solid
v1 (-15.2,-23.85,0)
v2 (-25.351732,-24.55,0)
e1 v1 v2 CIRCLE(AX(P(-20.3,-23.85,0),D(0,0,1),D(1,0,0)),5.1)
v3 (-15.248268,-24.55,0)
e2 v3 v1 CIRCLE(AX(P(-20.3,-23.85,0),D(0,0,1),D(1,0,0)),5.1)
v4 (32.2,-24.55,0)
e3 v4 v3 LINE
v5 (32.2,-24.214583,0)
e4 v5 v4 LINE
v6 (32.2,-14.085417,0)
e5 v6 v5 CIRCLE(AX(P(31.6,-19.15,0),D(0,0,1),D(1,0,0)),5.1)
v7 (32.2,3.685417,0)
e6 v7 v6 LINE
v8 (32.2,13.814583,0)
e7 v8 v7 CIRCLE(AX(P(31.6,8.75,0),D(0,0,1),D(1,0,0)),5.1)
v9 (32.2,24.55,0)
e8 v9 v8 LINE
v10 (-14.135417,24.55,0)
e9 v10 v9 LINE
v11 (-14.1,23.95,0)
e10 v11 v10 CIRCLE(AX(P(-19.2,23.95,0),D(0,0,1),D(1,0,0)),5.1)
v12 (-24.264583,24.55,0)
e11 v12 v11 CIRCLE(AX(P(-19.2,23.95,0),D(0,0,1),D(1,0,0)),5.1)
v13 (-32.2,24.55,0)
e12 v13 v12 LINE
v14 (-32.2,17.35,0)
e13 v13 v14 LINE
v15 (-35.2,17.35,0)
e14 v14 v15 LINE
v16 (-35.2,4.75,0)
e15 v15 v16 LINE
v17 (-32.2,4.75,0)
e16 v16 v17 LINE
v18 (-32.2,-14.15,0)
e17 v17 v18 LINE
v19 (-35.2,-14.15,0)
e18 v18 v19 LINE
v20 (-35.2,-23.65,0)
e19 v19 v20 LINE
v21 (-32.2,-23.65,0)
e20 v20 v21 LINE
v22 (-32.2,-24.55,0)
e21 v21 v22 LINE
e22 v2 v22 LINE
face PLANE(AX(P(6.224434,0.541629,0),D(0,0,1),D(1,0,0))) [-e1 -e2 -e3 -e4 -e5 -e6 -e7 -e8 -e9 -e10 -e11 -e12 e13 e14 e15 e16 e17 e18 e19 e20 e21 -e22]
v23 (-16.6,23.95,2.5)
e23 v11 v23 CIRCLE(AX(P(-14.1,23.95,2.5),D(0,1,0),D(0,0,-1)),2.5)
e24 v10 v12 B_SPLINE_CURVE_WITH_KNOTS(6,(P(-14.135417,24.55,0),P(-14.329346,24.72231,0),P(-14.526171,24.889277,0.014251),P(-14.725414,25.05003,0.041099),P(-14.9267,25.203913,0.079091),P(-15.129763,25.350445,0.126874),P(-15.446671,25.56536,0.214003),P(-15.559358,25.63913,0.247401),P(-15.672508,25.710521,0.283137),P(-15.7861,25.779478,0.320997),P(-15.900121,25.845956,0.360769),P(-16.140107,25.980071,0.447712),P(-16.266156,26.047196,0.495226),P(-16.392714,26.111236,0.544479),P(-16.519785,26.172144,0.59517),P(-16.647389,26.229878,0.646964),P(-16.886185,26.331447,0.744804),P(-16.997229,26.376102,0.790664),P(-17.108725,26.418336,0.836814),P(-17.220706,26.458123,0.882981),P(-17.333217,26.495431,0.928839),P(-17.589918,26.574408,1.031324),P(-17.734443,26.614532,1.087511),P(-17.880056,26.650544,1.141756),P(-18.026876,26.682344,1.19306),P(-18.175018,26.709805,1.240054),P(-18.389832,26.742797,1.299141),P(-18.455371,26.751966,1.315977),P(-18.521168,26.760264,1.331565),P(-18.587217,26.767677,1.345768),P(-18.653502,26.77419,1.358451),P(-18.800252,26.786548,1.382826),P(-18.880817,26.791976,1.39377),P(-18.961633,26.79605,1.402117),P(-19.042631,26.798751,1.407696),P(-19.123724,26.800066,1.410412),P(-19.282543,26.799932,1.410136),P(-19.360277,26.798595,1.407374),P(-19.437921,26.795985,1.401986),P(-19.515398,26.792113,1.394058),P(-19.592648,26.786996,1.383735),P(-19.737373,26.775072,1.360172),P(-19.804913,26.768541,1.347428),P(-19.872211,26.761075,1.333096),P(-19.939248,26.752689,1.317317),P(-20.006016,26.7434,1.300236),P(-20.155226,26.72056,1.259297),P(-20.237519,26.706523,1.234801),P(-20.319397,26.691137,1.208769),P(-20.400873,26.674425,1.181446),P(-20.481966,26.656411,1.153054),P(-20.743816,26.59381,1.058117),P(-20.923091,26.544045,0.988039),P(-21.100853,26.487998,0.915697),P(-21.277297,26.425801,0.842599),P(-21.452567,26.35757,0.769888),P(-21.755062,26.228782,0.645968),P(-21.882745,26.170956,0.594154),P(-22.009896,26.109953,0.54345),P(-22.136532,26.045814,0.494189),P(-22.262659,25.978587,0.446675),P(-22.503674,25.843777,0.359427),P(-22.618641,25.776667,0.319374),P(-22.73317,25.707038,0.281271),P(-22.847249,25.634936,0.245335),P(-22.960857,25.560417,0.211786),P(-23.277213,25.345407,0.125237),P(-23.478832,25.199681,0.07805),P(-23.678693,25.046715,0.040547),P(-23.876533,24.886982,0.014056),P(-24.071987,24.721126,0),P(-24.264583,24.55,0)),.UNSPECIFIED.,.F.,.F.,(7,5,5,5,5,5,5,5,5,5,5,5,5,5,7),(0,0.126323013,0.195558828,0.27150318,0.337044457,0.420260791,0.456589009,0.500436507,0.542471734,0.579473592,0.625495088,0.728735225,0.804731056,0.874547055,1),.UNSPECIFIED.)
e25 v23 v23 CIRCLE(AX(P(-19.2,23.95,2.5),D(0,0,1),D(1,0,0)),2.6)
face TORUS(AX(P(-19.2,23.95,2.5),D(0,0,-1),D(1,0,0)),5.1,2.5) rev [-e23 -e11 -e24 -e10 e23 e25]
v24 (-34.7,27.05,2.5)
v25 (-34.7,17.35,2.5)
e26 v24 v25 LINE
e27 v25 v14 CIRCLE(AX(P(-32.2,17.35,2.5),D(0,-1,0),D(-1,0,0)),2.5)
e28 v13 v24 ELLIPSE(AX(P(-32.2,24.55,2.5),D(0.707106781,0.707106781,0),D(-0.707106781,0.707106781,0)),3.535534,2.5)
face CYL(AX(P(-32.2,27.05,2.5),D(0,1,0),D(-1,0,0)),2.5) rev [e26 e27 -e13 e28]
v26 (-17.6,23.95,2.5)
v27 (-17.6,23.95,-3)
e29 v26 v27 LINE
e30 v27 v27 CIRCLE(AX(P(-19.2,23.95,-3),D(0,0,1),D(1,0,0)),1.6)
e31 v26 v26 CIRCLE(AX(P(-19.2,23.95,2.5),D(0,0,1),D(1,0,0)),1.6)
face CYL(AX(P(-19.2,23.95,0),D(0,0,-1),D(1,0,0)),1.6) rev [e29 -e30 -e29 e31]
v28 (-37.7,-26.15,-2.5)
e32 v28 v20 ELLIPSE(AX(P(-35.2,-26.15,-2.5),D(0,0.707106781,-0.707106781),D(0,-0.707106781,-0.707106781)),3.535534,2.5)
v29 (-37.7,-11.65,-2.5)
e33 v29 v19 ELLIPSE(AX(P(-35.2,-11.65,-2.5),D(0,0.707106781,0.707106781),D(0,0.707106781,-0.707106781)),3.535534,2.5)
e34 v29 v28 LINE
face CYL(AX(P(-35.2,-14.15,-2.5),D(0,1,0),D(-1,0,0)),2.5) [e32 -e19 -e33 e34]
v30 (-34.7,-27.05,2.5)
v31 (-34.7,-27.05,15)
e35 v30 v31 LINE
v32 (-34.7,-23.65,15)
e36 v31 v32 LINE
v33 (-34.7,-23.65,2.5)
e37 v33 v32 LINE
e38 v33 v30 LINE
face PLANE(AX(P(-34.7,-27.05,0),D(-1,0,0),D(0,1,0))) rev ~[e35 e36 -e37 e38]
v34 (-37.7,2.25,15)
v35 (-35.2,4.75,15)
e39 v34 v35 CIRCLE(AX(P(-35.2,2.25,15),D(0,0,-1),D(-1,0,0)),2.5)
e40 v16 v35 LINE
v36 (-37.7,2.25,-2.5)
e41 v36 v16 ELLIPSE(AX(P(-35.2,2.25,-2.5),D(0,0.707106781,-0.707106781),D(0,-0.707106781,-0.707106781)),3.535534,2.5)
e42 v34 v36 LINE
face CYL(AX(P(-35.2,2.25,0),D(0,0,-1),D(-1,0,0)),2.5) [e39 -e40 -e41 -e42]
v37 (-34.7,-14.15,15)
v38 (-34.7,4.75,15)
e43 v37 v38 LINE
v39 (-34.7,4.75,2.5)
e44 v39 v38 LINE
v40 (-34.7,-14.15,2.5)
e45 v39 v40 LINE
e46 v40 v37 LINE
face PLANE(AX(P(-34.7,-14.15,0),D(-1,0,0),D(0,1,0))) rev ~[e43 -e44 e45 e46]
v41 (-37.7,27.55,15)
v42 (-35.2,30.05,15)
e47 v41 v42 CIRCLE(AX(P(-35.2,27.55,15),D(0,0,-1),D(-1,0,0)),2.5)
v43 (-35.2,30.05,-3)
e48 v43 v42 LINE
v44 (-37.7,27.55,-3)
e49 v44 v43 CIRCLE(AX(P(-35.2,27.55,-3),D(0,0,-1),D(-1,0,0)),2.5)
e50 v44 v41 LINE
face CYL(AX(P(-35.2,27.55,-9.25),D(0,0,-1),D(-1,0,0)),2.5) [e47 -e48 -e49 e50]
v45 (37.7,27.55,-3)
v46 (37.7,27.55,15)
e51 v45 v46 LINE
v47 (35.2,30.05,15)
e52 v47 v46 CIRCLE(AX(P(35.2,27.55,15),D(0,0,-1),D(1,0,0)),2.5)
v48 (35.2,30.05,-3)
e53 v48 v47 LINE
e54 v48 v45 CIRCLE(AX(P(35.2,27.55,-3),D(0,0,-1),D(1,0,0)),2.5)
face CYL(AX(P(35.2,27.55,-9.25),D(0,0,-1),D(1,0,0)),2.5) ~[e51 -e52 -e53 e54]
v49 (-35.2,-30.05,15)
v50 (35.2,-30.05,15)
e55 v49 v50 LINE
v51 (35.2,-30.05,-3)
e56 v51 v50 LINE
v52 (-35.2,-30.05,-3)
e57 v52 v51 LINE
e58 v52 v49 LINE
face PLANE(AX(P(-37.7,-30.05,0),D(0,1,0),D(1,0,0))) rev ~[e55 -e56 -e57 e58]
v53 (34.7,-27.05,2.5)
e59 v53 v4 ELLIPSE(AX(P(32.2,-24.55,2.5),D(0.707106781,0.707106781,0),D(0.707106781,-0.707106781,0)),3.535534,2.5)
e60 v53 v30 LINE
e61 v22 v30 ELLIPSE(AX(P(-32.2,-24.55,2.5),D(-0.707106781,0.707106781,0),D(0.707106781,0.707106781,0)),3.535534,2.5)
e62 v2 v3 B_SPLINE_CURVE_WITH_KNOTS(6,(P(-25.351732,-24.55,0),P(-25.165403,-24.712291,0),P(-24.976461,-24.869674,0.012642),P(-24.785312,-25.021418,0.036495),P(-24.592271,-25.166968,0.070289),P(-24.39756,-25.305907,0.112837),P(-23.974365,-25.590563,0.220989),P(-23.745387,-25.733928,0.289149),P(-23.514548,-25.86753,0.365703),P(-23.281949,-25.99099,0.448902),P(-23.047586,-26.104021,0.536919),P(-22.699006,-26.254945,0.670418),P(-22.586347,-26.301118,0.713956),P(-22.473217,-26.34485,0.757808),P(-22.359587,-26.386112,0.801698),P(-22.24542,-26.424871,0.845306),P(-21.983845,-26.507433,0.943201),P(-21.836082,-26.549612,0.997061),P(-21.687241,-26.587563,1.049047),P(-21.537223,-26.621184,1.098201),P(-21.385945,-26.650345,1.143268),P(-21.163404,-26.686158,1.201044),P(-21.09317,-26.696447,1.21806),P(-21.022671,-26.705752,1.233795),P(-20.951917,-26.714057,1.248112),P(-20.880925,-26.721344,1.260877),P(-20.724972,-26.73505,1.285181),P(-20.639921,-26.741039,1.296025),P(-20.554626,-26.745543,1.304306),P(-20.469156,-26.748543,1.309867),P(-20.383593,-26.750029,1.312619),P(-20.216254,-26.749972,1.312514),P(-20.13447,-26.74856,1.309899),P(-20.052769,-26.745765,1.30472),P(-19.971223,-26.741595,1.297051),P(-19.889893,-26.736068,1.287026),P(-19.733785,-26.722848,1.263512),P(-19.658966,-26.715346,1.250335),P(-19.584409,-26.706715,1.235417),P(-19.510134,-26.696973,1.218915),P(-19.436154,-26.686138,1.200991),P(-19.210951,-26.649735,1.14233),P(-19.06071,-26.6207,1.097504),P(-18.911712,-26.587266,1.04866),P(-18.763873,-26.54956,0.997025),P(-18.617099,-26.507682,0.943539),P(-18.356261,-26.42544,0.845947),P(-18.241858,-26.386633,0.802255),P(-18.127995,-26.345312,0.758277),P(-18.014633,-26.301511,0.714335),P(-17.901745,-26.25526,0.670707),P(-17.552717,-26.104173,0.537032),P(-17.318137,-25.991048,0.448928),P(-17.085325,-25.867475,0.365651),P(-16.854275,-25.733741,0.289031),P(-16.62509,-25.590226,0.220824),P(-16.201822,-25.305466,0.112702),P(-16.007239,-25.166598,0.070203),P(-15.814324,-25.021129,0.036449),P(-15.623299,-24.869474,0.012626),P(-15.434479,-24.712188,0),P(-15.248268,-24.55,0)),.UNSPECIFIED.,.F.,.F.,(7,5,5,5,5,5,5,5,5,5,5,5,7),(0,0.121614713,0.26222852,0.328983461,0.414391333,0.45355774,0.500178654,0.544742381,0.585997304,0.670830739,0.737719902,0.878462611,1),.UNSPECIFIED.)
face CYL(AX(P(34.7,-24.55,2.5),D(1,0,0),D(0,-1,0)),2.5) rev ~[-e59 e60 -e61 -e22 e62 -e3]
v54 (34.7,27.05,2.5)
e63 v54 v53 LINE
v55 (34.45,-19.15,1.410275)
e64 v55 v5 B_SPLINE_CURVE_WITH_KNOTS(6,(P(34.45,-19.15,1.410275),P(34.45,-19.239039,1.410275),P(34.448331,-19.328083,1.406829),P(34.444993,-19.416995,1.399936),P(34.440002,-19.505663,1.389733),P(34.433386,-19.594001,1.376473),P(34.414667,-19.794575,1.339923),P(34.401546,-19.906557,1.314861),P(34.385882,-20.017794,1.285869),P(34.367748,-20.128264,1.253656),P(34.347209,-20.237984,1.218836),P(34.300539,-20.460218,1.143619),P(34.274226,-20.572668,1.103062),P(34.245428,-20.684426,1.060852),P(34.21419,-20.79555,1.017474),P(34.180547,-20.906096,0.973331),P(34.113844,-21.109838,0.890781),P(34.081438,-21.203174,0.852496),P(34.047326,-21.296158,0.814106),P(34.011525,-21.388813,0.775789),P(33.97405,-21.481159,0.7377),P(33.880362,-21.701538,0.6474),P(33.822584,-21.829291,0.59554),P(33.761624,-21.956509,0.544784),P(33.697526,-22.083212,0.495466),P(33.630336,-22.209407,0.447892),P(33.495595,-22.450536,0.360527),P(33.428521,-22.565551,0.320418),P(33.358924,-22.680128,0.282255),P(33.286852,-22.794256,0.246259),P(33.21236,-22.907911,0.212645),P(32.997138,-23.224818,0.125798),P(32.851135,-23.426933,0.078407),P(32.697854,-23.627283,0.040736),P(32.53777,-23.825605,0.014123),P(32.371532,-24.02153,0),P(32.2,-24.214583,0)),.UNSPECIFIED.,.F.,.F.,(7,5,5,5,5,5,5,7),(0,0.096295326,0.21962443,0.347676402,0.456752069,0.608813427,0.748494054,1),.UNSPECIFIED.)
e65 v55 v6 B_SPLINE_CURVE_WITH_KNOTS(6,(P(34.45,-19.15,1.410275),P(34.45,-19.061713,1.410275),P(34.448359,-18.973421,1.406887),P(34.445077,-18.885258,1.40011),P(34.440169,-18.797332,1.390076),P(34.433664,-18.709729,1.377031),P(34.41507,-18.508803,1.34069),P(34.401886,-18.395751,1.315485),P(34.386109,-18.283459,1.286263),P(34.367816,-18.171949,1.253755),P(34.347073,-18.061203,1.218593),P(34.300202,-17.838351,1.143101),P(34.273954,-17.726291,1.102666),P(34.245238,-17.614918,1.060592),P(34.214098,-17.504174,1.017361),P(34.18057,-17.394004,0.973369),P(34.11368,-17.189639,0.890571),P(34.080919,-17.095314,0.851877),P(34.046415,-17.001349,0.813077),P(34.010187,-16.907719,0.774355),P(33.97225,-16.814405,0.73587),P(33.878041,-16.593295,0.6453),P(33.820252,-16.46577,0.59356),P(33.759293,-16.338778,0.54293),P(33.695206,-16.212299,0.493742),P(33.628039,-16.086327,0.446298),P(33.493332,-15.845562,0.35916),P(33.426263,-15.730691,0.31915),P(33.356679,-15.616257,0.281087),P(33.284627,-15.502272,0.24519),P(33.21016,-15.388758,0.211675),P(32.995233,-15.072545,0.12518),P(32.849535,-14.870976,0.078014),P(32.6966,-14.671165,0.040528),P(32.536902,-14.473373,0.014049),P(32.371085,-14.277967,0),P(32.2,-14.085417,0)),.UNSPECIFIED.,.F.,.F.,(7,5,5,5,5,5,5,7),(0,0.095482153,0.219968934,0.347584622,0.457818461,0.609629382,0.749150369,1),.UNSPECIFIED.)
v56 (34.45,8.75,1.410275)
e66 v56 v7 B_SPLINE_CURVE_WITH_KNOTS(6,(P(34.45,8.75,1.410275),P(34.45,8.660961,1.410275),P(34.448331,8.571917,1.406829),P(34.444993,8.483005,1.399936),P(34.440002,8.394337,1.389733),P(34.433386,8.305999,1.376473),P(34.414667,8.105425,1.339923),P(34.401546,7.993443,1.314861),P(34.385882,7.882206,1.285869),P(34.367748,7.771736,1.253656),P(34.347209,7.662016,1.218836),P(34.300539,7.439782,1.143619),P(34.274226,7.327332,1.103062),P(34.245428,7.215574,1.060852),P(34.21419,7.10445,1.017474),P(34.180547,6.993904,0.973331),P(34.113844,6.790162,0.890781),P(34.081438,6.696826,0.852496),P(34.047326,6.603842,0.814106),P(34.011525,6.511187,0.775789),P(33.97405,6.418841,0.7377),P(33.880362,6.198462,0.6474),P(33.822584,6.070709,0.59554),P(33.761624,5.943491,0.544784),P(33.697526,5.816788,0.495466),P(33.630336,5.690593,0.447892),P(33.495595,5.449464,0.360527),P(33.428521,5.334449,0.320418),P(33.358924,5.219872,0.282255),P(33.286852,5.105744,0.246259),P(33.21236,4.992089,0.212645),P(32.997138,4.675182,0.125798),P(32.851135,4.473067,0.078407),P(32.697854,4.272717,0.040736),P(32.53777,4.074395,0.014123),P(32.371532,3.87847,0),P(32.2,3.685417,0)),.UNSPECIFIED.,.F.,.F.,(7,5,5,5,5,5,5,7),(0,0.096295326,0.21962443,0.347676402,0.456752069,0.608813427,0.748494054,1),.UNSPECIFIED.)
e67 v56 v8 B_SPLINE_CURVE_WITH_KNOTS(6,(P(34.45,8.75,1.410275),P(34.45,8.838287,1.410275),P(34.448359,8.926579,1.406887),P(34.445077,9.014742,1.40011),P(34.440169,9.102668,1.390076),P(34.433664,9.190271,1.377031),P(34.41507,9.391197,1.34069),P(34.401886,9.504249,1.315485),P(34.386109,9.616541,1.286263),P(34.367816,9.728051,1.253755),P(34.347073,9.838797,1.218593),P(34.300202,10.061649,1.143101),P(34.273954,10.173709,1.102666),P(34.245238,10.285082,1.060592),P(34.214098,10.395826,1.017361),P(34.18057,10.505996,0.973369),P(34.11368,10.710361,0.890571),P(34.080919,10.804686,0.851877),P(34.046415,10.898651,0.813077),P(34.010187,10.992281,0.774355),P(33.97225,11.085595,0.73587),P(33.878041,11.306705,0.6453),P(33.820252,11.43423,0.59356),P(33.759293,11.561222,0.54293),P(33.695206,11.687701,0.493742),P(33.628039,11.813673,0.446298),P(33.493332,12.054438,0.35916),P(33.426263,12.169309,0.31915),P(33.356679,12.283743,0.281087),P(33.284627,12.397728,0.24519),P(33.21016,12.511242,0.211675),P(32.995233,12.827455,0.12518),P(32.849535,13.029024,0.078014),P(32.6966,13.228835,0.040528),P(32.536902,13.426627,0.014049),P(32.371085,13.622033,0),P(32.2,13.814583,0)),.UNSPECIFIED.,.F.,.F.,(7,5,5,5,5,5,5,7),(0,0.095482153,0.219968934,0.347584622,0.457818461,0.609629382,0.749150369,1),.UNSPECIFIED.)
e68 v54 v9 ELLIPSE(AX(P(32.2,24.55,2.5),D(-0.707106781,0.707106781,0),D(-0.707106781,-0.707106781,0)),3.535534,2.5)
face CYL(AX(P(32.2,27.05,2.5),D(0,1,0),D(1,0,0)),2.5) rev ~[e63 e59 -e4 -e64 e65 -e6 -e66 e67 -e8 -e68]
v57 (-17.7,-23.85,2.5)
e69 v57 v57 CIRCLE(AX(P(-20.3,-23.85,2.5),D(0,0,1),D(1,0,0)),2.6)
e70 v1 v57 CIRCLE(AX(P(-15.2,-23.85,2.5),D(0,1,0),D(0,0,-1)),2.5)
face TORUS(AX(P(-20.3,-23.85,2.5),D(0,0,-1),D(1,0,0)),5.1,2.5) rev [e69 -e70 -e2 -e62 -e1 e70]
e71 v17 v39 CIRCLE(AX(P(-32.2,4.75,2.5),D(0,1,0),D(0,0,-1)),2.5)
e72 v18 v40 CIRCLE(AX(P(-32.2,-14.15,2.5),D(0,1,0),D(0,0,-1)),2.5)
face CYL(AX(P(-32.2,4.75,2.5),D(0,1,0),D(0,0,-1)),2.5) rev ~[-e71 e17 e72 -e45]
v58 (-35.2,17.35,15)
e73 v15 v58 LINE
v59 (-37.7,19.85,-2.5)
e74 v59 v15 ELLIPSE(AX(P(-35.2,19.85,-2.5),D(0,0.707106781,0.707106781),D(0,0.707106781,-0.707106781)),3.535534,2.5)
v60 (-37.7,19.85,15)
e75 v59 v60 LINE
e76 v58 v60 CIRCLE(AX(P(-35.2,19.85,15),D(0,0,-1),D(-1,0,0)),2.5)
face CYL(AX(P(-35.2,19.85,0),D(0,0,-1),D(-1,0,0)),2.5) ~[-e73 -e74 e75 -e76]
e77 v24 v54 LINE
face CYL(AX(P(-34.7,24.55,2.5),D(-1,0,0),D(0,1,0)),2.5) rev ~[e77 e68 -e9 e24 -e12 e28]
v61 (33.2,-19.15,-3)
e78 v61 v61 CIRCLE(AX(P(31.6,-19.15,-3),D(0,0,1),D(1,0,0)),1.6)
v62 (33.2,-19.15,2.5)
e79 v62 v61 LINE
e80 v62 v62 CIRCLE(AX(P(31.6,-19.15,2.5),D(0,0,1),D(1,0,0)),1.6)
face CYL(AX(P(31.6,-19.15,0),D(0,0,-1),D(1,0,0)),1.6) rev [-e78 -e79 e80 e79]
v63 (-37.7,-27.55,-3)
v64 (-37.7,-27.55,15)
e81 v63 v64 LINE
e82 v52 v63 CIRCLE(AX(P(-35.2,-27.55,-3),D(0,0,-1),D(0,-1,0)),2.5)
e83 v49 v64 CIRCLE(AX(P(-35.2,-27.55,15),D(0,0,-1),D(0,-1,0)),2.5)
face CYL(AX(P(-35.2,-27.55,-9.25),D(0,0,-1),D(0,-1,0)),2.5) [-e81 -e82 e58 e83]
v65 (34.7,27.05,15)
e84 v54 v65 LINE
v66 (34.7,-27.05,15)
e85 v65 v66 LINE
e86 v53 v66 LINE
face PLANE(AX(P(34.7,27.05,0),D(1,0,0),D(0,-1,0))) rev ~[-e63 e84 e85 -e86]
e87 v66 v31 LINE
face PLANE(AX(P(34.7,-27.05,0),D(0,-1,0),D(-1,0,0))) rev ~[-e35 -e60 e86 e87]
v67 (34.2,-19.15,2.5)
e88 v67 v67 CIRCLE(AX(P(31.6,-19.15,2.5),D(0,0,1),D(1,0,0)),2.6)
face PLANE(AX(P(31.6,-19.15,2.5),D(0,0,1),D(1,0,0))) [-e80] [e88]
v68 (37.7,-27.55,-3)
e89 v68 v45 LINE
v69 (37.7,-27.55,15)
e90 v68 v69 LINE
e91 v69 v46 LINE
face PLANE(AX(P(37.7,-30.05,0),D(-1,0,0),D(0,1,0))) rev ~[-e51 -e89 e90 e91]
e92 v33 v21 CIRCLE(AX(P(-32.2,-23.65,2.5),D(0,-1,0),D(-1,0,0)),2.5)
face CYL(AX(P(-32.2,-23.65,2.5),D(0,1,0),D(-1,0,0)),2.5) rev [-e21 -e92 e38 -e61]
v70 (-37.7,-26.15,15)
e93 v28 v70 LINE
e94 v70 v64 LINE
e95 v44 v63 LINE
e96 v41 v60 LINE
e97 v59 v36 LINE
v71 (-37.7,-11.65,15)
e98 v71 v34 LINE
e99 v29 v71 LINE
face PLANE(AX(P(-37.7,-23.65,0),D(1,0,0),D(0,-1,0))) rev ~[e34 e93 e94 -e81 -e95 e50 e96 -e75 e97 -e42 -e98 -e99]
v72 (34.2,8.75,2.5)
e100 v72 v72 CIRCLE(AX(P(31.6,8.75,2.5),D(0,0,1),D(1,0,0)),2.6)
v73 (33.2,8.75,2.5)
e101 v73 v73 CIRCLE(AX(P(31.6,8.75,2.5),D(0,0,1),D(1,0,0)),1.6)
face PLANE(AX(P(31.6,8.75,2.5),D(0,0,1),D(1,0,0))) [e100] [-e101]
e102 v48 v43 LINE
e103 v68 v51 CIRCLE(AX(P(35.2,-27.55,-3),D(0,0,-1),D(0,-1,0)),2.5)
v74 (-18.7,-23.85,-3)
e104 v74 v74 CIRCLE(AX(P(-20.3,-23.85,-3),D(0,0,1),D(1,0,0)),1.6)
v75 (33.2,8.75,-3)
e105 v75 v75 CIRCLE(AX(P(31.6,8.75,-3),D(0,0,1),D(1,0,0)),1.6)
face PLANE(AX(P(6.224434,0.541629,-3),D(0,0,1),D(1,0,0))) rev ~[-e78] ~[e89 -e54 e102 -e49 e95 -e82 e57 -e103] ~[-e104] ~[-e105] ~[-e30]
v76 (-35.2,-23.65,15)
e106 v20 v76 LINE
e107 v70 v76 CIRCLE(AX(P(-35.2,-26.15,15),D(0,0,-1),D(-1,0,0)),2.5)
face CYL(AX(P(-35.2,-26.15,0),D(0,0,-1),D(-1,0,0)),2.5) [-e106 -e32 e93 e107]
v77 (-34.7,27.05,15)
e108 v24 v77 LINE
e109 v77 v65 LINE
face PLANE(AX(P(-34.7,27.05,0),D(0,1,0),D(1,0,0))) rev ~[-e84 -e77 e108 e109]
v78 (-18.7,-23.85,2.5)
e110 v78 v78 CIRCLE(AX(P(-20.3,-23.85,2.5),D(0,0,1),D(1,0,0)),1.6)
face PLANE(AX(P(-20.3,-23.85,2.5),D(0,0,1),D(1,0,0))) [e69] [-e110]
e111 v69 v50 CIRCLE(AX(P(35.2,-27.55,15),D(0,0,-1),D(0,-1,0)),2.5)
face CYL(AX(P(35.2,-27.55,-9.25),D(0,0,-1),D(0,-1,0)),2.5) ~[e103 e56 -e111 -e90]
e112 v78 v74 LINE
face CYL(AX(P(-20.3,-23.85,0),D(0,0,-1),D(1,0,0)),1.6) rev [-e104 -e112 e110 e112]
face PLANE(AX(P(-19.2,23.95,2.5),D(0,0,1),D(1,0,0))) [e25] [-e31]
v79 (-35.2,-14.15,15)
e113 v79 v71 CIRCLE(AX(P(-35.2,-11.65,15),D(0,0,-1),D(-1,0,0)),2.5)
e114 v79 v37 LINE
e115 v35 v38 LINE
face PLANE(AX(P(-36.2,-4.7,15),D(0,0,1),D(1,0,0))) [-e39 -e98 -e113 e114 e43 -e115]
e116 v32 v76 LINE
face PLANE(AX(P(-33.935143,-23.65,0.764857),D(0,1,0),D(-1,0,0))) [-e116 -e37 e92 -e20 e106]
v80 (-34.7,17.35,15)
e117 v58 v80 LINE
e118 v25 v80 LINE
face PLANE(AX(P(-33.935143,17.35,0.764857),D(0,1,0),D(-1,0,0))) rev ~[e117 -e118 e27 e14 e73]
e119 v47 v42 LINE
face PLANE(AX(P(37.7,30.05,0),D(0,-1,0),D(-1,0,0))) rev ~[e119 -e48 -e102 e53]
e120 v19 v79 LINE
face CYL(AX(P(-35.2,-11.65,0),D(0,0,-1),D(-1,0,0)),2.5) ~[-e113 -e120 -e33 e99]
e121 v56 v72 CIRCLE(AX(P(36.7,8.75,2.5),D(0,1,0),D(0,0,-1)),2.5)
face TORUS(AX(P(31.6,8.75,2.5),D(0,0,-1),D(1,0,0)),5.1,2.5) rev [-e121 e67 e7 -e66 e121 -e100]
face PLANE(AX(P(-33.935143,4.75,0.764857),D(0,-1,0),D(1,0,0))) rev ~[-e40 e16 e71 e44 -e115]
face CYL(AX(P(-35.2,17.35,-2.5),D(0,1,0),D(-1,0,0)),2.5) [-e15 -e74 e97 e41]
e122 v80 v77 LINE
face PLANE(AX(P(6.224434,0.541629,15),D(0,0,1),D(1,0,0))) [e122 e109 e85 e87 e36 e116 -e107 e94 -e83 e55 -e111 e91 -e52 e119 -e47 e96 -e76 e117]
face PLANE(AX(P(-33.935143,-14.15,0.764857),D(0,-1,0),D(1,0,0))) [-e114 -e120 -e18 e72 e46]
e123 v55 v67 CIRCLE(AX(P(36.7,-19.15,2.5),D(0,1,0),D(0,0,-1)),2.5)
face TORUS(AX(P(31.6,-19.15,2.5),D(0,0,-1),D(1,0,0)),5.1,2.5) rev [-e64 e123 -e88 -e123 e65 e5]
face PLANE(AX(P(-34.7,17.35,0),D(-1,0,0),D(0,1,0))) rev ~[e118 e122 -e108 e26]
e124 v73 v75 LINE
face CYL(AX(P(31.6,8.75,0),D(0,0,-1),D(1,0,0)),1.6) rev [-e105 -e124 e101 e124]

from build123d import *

# Parameters (mm, degrees)
F0_W         = 0.4
F0_H         = 0.3
F0_H_2       = 8.9
F0_W_2       = 9.5
F0_R         = 2.6
F0_W_3       = 10.3
F0_H_3       = 12
F0_W_4       = 3
F0_R_2       = 1.6
F0_H_4       = 18.9
F1_DEPTH     = 3
F2_DEPTH     = 15
F3_DEPTH     = 2.5
F4_T1_DEPTH  = 9.7
F4_T3_DEPTH  = 18.9
F4_T5_DEPTH  = 3.4
F4_T10_DEPTH = 69.4
F4_S11_R     = 2.6
F4_T12_DEPTH = 36
F4_T16_DEPTH = 69.4
F4_S17_R     = 2.6
F4_T18_DEPTH = 36
F4_T22_DEPTH = 54.1
F4_S23_R     = 2.6
F4_T24_DEPTH = 29
F4_S25_R     = 2.6
F4_T26_DEPTH = 29
F4_T35_DEPTH = 30.5
F4_T37_DEPTH = 21.25
F4_T39_DEPTH = 12.6
F4_T41_DEPTH = 9.5
F4_T47_DEPTH = 15.75
F4_T51_DEPTH = 21.25
F4_T59_DEPTH = 18.85
F4_T63_DEPTH = 21.25
F4_T71_DEPTH = 21.25
F4_T76_DEPTH = 18.85
F4_T83_DEPTH = 21.25
F4_T88_DEPTH = 15.75


# Not quite as in the source:
# - a fillet or chamfer that OpenCascade refuses, or shapes differently, is made with other operations: its cross-section is extruded or revolved along the edge and cut away or added


with BuildPart() as f1:
    # F0 (on Top) → F1 (new body)
    with BuildSketch(Plane.XY):
        Polygon((-34.7, -27.05), (-34.7, -23.65), (-37.7, -23.65), (-37.7, -30.05), (37.7, -30.05), (37.7, 30.05), (-37.7, 30.05), (-37.7, 17.35), (-34.7, 17.35), (-34.7, 27.05), (34.7, 27.05), (34.7, -27.05), align=None)
        with Locations((-34.5, -14.3)):
            Rectangle(F0_W, F0_H)
        with Locations((-34.5, -18.9)):
            Rectangle(F0_W, F0_H_2)
        with Locations((-29.55, -18.9)):
            Rectangle(F0_W_2, F0_H_2)
        Polygon((-34.3, -26.65), (34.3, -26.65), (34.3, 26.65), (-34.3, 26.65), (-34.3, 17.35), (-23.7, 17.35), (-23.7, 4.75), (-34.3, 4.75), (-34.3, -14.15), (-24.5, -14.15), (-24.5, -23.65), (-34.3, -23.65), align=None)
        with Locations((-20.3, -23.85)):
            Circle(F0_R, mode=Mode.SUBTRACT)
        with Locations((31.6, -19.15)):
            Circle(F0_R, mode=Mode.SUBTRACT)
        with Locations((-19.2, 23.95)):
            Circle(F0_R, mode=Mode.SUBTRACT)
        with Locations((31.6, 8.75)):
            Circle(F0_R, mode=Mode.SUBTRACT)
        Polygon((34.3, 26.65), (34.3, -26.65), (-34.3, -26.65), (-34.3, -23.65), (-34.7, -23.65), (-34.7, -27.05), (34.7, -27.05), (34.7, 27.05), (-34.7, 27.05), (-34.7, 17.35), (-34.3, 17.35), (-34.3, 26.65), align=None)
        with Locations((-29.15, 11.05)):
            Rectangle(F0_W_3, F0_H_3)
        with Locations((-36.2, 11.05)):
            Rectangle(F0_W_4, F0_H_3)
        with Locations((-34.5, 11.05)):
            Rectangle(F0_W, F0_H_3)
        with Locations((-36.2, -18.9)):
            Rectangle(F0_W_4, F0_H_2)
        with Locations((-36.2, -14.3)):
            Rectangle(F0_W_4, F0_H)
        with Locations((-19.2, 23.95)):
            Circle(F0_R)
        with Locations((-19.2, 23.95)):
            Circle(F0_R_2, mode=Mode.SUBTRACT)
        with Locations((-20.3, -23.85)):
            Circle(F0_R)
        with Locations((-20.3, -23.85)):
            Circle(F0_R_2, mode=Mode.SUBTRACT)
        with Locations((31.6, -19.15)):
            Circle(F0_R)
        with Locations((31.6, -19.15)):
            Circle(F0_R_2, mode=Mode.SUBTRACT)
        with Locations((31.6, 8.75)):
            Circle(F0_R)
        with Locations((31.6, 8.75)):
            Circle(F0_R_2, mode=Mode.SUBTRACT)
        with Locations((-36.2, 4.9)):
            Rectangle(F0_W_4, F0_H)
        with Locations((-34.5, 4.9)):
            Rectangle(F0_W, F0_H)
        Polygon((-23.7, 17.35), (-34.3, 17.35), (-34.3, 17.05), (-24, 17.05), (-24, 5.05), (-34.3, 5.05), (-34.3, 4.75), (-23.7, 4.75), align=None)
        with Locations((-34.5, -4.7)):
            Rectangle(F0_W, F0_H_4)
        with Locations((-36.2, -4.7)):
            Rectangle(F0_W_4, F0_H_4)
        Polygon((-34.3, -23.35), (-34.3, -23.65), (-24.5, -23.65), (-24.5, -14.15), (-34.3, -14.15), (-34.3, -14.45), (-24.8, -14.45), (-24.8, -23.35), align=None)
        with Locations((-36.2, 17.2)):
            Rectangle(F0_W_4, F0_H)
        with Locations((-34.5, 17.2)):
            Rectangle(F0_W, F0_H)
        with Locations((-34.5, -23.5)):
            Rectangle(F0_W, F0_H)
        with Locations((-36.2, -23.5)):
            Rectangle(F0_W_4, F0_H)
    extrude(amount=-F1_DEPTH)

    # F0 (on Top) → F2 (join)
    with BuildSketch(Plane.XY):
        Polygon((-34.7, -27.05), (-34.7, -23.65), (-37.7, -23.65), (-37.7, -30.05), (37.7, -30.05), (37.7, 30.05), (-37.7, 30.05), (-37.7, 17.35), (-34.7, 17.35), (-34.7, 27.05), (34.7, 27.05), (34.7, -27.05), align=None)
        with Locations((-36.2, -4.7)):
            Rectangle(F0_W_4, F0_H_4)
    extrude(amount=F2_DEPTH)

    # F0 (on Top) → F3 (join)
    with BuildSketch(Plane.XY):
        with Locations((-20.3, -23.85)):
            Circle(F0_R)
        with Locations((-20.3, -23.85)):
            Circle(F0_R_2, mode=Mode.SUBTRACT)
        with Locations((-19.2, 23.95)):
            Circle(F0_R)
        with Locations((-19.2, 23.95)):
            Circle(F0_R_2, mode=Mode.SUBTRACT)
        with Locations((31.6, 8.75)):
            Circle(F0_R)
        with Locations((31.6, 8.75)):
            Circle(F0_R_2, mode=Mode.SUBTRACT)
        with Locations((31.6, -19.15)):
            Circle(F0_R)
        with Locations((31.6, -19.15)):
            Circle(F0_R_2, mode=Mode.SUBTRACT)
    extrude(amount=F3_DEPTH)

    # F4: fillet of radius 2.5 on 20 edges, made by hand

    # F4_s2 → F4_t1 (join)
    with BuildSketch(Plane.XZ.offset(-27.05)):
        with BuildLine():
            ThreePointArc((-34.7, 2.5), (-33.967766953, 0.732233047), (-32.2, 0))
            Line((-32.2, 0), (-34.7, 0))
            Line((-34.7, 0), (-34.7, 2.5))
        make_face()
    extrude(amount=F4_T1_DEPTH)

    # F4_s4 → F4_t3 (join)
    with BuildSketch(Plane.XZ.offset(-4.75)):
        with BuildLine():
            ThreePointArc((-32.2, 0), (-33.967766953, 0.732233047), (-34.7, 2.5))
            Line((-34.7, 2.5), (-34.7, 0))
            Line((-34.7, 0), (-32.2, 0))
        make_face()
    extrude(amount=F4_T3_DEPTH)

    # F4_s6 → F4_t5 (join)
    with BuildSketch(Plane.XZ.offset(23.65)):
        with BuildLine():
            ThreePointArc((-34.7, 2.5), (-33.967766953, 0.732233047), (-32.2, 0))
            Line((-32.2, 0), (-34.7, 0))
            Line((-34.7, 0), (-34.7, 2.5))
        make_face()
    extrude(amount=F4_T5_DEPTH)


with BuildPart() as f4_tool8:
    # F4_s9 → F4_t10 (new body)
    with BuildSketch(Plane.YZ.offset(-34.7)):
        with BuildLine():
            ThreePointArc((27.05, 2.5), (26.317766953, 0.732233047), (24.55, 0))
            Line((24.55, 0), (27.05, 0))
            Line((27.05, 0), (27.05, 2.5))
        make_face()
    extrude(amount=F4_T10_DEPTH)

    # F4_s11 → F4_t12 (cut, symmetric)
    with BuildSketch(Plane.XY.offset(1.2)):
        with Locations((-19.2, 23.95)):
            Circle(F4_S11_R)
    extrude(amount=F4_T12_DEPTH, both=True, mode=Mode.SUBTRACT)


with BuildPart() as f1_1:
    add(f1.part)

    # F4_t7: union F4_tool8
    add(f4_tool8.part)


with BuildPart() as f4_tool14:
    # F4_s15 → F4_t16 (new body)
    with BuildSketch(Plane.YZ.offset(34.7)):
        with BuildLine():
            ThreePointArc((-27.05, 2.5), (-26.317766953, 0.732233047), (-24.55, 0))
            Line((-24.55, 0), (-27.05, 0))
            Line((-27.05, 0), (-27.05, 2.5))
        make_face()
    extrude(amount=-F4_T16_DEPTH)

    # F4_s17 → F4_t18 (cut, symmetric)
    with BuildSketch(Plane.XY.offset(1.2)):
        with Locations((-20.3, -23.85)):
            Circle(F4_S17_R)
    extrude(amount=F4_T18_DEPTH, both=True, mode=Mode.SUBTRACT)


with BuildPart() as f1_2:
    add(f1_1.part)

    # F4_t13: union F4_tool14
    add(f4_tool14.part)


with BuildPart() as f4_tool20:
    # F4_s21 → F4_t22 (new body)
    with BuildSketch(Plane.XZ.offset(-27.05)):
        with BuildLine():
            ThreePointArc((34.7, 2.5), (33.967766953, 0.732233047), (32.2, 0))
            Line((32.2, 0), (34.7, 0))
            Line((34.7, 0), (34.7, 2.5))
        make_face()
    extrude(amount=F4_T22_DEPTH)

    # F4_s23 → F4_t24 (cut, symmetric)
    with BuildSketch(Plane.XY.offset(1.2)):
        with Locations((31.6, -19.15)):
            Circle(F4_S23_R)
    extrude(amount=F4_T24_DEPTH, both=True, mode=Mode.SUBTRACT)

    # F4_s25 → F4_t26 (cut, symmetric)
    with BuildSketch(Plane.XY.offset(1.2)):
        with Locations((31.6, 8.75)):
            Circle(F4_S25_R)
    extrude(amount=F4_T26_DEPTH, both=True, mode=Mode.SUBTRACT)


with BuildPart() as f1_3:
    add(f1_2.part)

    # F4_t19: union F4_tool20
    add(f4_tool20.part)

    # F4_s27 → F4_t28 (revolve)
    with BuildSketch(Plane.XZ.offset(-8.75)):
        with BuildLine():
            ThreePointArc((36.7, 0), (34.932233047, 0.732233047), (34.2, 2.5))
            Line((34.2, 2.5), (34.2, 0))
            Line((34.2, 0), (36.7, 0))
        make_face()
    revolve(axis=Axis((31.6, 8.75, 0), (0, 0, 1)))

    # F4_s29 → F4_t30 (revolve)
    with BuildSketch(Plane.XZ.offset(19.15)):
        with BuildLine():
            ThreePointArc((36.7, 0), (34.932233047, 0.732233047), (34.2, 2.5))
            Line((34.2, 2.5), (34.2, 0))
            Line((34.2, 0), (36.7, 0))
        make_face()
    revolve(axis=Axis((31.6, -19.15, 0), (0, 0, 1)))

    # F4_s31 → F4_t32 (revolve)
    with BuildSketch(Plane.XZ.offset(23.85)):
        with BuildLine():
            ThreePointArc((-15.2, 0), (-16.967766953, 0.732233047), (-17.7, 2.5))
            Line((-17.7, 2.5), (-17.7, 0))
            Line((-17.7, 0), (-15.2, 0))
        make_face()
    revolve(axis=Axis((-20.3, -23.85, 0), (0, 0, 1)))

    # F4_s33 → F4_t34 (revolve)
    with BuildSketch(Plane.XZ.offset(-23.95)):
        with BuildLine():
            ThreePointArc((-14.1, 0), (-15.867766953, 0.732233047), (-16.6, 2.5))
            Line((-16.6, 2.5), (-16.6, 0))
            Line((-16.6, 0), (-14.1, 0))
        make_face()
    revolve(axis=Axis((-19.2, 23.95, 0), (0, 0, 1)))

    # F4_s36 → F4_t35 (cut)
    with BuildSketch(Plane.XY.offset(-9.25)):
        with BuildLine():
            ThreePointArc((35.2, -30.05), (36.967766953, -29.317766953), (37.7, -27.55))
            Line((37.7, -27.55), (37.7, -30.05))
            Line((37.7, -30.05), (35.2, -30.05))
        make_face()
        with BuildLine():
            ThreePointArc((37.7, 27.55), (36.967766953, 29.317766953), (35.2, 30.05))
            Line((35.2, 30.05), (37.7, 30.05))
            Line((37.7, 30.05), (37.7, 27.55))
        make_face()
        with BuildLine():
            ThreePointArc((-37.7, 27.55), (-36.967766953, 29.317766953), (-35.2, 30.05))
            Line((-35.2, 30.05), (-37.7, 30.05))
            Line((-37.7, 30.05), (-37.7, 27.55))
        make_face()
        with BuildLine():
            ThreePointArc((-35.2, -30.05), (-36.967766953, -29.317766953), (-37.7, -27.55))
            Line((-37.7, -27.55), (-37.7, -30.05))
            Line((-37.7, -30.05), (-35.2, -30.05))
        make_face()
    extrude(amount=F4_T35_DEPTH, mode=Mode.SUBTRACT)

    # F4_s38 → F4_t37 (cut)
    with BuildSketch(Plane.XY):
        with BuildLine():
            ThreePointArc((-37.7, -11.65), (-36.967766953, -13.417766953), (-35.2, -14.15))
            Line((-35.2, -14.15), (-37.7, -14.15))
            Line((-37.7, -14.15), (-37.7, -11.65))
        make_face()
        with BuildLine():
            ThreePointArc((-37.7, 19.85), (-36.967766953, 18.082233047), (-35.2, 17.35))
            Line((-35.2, 17.35), (-37.7, 17.35))
            Line((-37.7, 17.35), (-37.7, 19.85))
        make_face()
        with BuildLine():
            ThreePointArc((-37.7, 2.25), (-36.967766953, 4.017766953), (-35.2, 4.75))
            Line((-35.2, 4.75), (-37.7, 4.75))
            Line((-37.7, 4.75), (-37.7, 2.25))
        make_face()
        with BuildLine():
            ThreePointArc((-37.7, -26.15), (-36.967766953, -24.382233047), (-35.2, -23.65))
            Line((-35.2, -23.65), (-37.7, -23.65))
            Line((-37.7, -23.65), (-37.7, -26.15))
        make_face()
    extrude(amount=F4_T37_DEPTH, mode=Mode.SUBTRACT)

    # F4_s40 → F4_t39 (cut)
    with BuildSketch(Plane.XZ.offset(-17.35)):
        with BuildLine():
            ThreePointArc((-37.7, -2.5), (-36.967766953, -0.732233047), (-35.2, 0))
            Line((-35.2, 0), (-37.7, 0))
            Line((-37.7, 0), (-37.7, -2.5))
        make_face()
    extrude(amount=F4_T39_DEPTH, mode=Mode.SUBTRACT)

    # F4_s42 → F4_t41 (cut)
    with BuildSketch(Plane.XZ.offset(14.15)):
        with BuildLine():
            ThreePointArc((-37.7, -2.5), (-36.967766953, -0.732233047), (-35.2, 0))
            Line((-35.2, 0), (-37.7, 0))
            Line((-37.7, 0), (-37.7, -2.5))
        make_face()
    extrude(amount=F4_T41_DEPTH, mode=Mode.SUBTRACT)


with BuildPart() as f4_tool45:
    # F4_s46 → F4_t47 (new body)
    with BuildSketch(Plane.XZ.offset(7.9)):
        with BuildLine():
            ThreePointArc((-37.7, -2.5), (-36.967766953, -0.732233047), (-35.2, 0))
            Line((-35.2, 0), (-37.7, 0))
            Line((-37.7, 0), (-37.7, -2.5))
        make_face()
    extrude(amount=F4_T47_DEPTH)

    split(bisect_by=Plane.XZ.offset(14.15), keep=Keep.BOTTOM)


with BuildPart() as f4_tool49:
    # F4_s50 → F4_t51 (new body)
    with BuildSketch(Plane.XY.offset(-6.25)):
        with BuildLine():
            ThreePointArc((-37.7, -11.65), (-36.967766953, -13.417766953), (-35.2, -14.15))
            Line((-35.2, -14.15), (-37.7, -14.15))
            Line((-37.7, -14.15), (-37.7, -11.65))
        make_face()
    extrude(amount=F4_T51_DEPTH)

    split(bisect_by=Plane.XY.offset(-3), keep=Keep.TOP)

    split(bisect_by=Plane.XY, keep=Keep.BOTTOM)


with BuildPart() as f4_tool45_1:
    add(f4_tool45.part)

    # F4_t54: intersect F4_tool49
    add(f4_tool49.part, mode=Mode.INTERSECT)


with BuildPart() as f1_4:
    add(f1_3.part)

    # F4_t43: cut F4_tool45
    add(f4_tool45_1.part, mode=Mode.SUBTRACT)


with BuildPart() as f4_tool57:
    # F4_s58 → F4_t59 (new body)
    with BuildSketch(Plane.XZ.offset(-23.6)):
        with BuildLine():
            ThreePointArc((-37.7, -2.5), (-36.967766953, -0.732233047), (-35.2, 0))
            Line((-35.2, 0), (-37.7, 0))
            Line((-37.7, 0), (-37.7, -2.5))
        make_face()
    extrude(amount=F4_T59_DEPTH)

    split(bisect_by=Plane.XZ.offset(-17.35), keep=Keep.BOTTOM)


with BuildPart() as f4_tool61:
    # F4_s62 → F4_t63 (new body)
    with BuildSketch(Plane.XY.offset(-6.25)):
        with BuildLine():
            ThreePointArc((-37.7, 19.85), (-36.967766953, 18.082233047), (-35.2, 17.35))
            Line((-35.2, 17.35), (-37.7, 17.35))
            Line((-37.7, 17.35), (-37.7, 19.85))
        make_face()
    extrude(amount=F4_T63_DEPTH)

    split(bisect_by=Plane.XY.offset(-3), keep=Keep.TOP)

    split(bisect_by=Plane.XY, keep=Keep.BOTTOM)


with BuildPart() as f4_tool57_1:
    add(f4_tool57.part)

    # F4_t66: intersect F4_tool61
    add(f4_tool61.part, mode=Mode.INTERSECT)


with BuildPart() as f1_5:
    add(f1_4.part)

    # F4_t55: cut F4_tool57
    add(f4_tool57_1.part, mode=Mode.SUBTRACT)


with BuildPart() as f4_tool69:
    # F4_s70 → F4_t71 (new body)
    with BuildSketch(Plane.XY.offset(-6.25)):
        with BuildLine():
            ThreePointArc((-37.7, 2.25), (-36.967766953, 4.017766953), (-35.2, 4.75))
            Line((-35.2, 4.75), (-37.7, 4.75))
            Line((-37.7, 4.75), (-37.7, 2.25))
        make_face()
    extrude(amount=F4_T71_DEPTH)

    split(bisect_by=Plane.XY.offset(-3), keep=Keep.TOP)

    split(bisect_by=Plane.XY, keep=Keep.BOTTOM)


with BuildPart() as f4_tool74:
    # F4_s75 → F4_t76 (new body)
    with BuildSketch(Plane.XZ.offset(-17.35)):
        with BuildLine():
            ThreePointArc((-37.7, -2.5), (-36.967766953, -0.732233047), (-35.2, 0))
            Line((-35.2, 0), (-37.7, 0))
            Line((-37.7, 0), (-37.7, -2.5))
        make_face()
    extrude(amount=F4_T76_DEPTH)

    split(bisect_by=Plane.XZ.offset(-4.75), keep=Keep.TOP)


with BuildPart() as f4_tool69_1:
    add(f4_tool69.part)

    # F4_t78: intersect F4_tool74
    add(f4_tool74.part, mode=Mode.INTERSECT)


with BuildPart() as f1_6:
    add(f1_5.part)

    # F4_t67: cut F4_tool69
    add(f4_tool69_1.part, mode=Mode.SUBTRACT)


with BuildPart() as f4_tool81:
    # F4_s82 → F4_t83 (new body)
    with BuildSketch(Plane.XY.offset(-6.25)):
        with BuildLine():
            ThreePointArc((-37.7, -26.15), (-36.967766953, -24.382233047), (-35.2, -23.65))
            Line((-35.2, -23.65), (-37.7, -23.65))
            Line((-37.7, -23.65), (-37.7, -26.15))
        make_face()
    extrude(amount=F4_T83_DEPTH)

    split(bisect_by=Plane.XY.offset(-3), keep=Keep.TOP)

    split(bisect_by=Plane.XY, keep=Keep.BOTTOM)


with BuildPart() as f4_tool86:
    # F4_s87 → F4_t88 (new body)
    with BuildSketch(Plane.XZ.offset(14.15)):
        with BuildLine():
            ThreePointArc((-37.7, -2.5), (-36.967766953, -0.732233047), (-35.2, 0))
            Line((-35.2, 0), (-37.7, 0))
            Line((-37.7, 0), (-37.7, -2.5))
        make_face()
    extrude(amount=F4_T88_DEPTH)

    split(bisect_by=Plane.XZ.offset(23.65), keep=Keep.TOP)


with BuildPart() as f4_tool81_1:
    add(f4_tool81.part)

    # F4_t90: intersect F4_tool86
    add(f4_tool86.part, mode=Mode.INTERSECT)


with BuildPart() as f1_7:
    add(f1_6.part)

    # F4_t79: cut F4_tool81
    add(f4_tool81_1.part, mode=Mode.SUBTRACT)


solid = f1_7.part
